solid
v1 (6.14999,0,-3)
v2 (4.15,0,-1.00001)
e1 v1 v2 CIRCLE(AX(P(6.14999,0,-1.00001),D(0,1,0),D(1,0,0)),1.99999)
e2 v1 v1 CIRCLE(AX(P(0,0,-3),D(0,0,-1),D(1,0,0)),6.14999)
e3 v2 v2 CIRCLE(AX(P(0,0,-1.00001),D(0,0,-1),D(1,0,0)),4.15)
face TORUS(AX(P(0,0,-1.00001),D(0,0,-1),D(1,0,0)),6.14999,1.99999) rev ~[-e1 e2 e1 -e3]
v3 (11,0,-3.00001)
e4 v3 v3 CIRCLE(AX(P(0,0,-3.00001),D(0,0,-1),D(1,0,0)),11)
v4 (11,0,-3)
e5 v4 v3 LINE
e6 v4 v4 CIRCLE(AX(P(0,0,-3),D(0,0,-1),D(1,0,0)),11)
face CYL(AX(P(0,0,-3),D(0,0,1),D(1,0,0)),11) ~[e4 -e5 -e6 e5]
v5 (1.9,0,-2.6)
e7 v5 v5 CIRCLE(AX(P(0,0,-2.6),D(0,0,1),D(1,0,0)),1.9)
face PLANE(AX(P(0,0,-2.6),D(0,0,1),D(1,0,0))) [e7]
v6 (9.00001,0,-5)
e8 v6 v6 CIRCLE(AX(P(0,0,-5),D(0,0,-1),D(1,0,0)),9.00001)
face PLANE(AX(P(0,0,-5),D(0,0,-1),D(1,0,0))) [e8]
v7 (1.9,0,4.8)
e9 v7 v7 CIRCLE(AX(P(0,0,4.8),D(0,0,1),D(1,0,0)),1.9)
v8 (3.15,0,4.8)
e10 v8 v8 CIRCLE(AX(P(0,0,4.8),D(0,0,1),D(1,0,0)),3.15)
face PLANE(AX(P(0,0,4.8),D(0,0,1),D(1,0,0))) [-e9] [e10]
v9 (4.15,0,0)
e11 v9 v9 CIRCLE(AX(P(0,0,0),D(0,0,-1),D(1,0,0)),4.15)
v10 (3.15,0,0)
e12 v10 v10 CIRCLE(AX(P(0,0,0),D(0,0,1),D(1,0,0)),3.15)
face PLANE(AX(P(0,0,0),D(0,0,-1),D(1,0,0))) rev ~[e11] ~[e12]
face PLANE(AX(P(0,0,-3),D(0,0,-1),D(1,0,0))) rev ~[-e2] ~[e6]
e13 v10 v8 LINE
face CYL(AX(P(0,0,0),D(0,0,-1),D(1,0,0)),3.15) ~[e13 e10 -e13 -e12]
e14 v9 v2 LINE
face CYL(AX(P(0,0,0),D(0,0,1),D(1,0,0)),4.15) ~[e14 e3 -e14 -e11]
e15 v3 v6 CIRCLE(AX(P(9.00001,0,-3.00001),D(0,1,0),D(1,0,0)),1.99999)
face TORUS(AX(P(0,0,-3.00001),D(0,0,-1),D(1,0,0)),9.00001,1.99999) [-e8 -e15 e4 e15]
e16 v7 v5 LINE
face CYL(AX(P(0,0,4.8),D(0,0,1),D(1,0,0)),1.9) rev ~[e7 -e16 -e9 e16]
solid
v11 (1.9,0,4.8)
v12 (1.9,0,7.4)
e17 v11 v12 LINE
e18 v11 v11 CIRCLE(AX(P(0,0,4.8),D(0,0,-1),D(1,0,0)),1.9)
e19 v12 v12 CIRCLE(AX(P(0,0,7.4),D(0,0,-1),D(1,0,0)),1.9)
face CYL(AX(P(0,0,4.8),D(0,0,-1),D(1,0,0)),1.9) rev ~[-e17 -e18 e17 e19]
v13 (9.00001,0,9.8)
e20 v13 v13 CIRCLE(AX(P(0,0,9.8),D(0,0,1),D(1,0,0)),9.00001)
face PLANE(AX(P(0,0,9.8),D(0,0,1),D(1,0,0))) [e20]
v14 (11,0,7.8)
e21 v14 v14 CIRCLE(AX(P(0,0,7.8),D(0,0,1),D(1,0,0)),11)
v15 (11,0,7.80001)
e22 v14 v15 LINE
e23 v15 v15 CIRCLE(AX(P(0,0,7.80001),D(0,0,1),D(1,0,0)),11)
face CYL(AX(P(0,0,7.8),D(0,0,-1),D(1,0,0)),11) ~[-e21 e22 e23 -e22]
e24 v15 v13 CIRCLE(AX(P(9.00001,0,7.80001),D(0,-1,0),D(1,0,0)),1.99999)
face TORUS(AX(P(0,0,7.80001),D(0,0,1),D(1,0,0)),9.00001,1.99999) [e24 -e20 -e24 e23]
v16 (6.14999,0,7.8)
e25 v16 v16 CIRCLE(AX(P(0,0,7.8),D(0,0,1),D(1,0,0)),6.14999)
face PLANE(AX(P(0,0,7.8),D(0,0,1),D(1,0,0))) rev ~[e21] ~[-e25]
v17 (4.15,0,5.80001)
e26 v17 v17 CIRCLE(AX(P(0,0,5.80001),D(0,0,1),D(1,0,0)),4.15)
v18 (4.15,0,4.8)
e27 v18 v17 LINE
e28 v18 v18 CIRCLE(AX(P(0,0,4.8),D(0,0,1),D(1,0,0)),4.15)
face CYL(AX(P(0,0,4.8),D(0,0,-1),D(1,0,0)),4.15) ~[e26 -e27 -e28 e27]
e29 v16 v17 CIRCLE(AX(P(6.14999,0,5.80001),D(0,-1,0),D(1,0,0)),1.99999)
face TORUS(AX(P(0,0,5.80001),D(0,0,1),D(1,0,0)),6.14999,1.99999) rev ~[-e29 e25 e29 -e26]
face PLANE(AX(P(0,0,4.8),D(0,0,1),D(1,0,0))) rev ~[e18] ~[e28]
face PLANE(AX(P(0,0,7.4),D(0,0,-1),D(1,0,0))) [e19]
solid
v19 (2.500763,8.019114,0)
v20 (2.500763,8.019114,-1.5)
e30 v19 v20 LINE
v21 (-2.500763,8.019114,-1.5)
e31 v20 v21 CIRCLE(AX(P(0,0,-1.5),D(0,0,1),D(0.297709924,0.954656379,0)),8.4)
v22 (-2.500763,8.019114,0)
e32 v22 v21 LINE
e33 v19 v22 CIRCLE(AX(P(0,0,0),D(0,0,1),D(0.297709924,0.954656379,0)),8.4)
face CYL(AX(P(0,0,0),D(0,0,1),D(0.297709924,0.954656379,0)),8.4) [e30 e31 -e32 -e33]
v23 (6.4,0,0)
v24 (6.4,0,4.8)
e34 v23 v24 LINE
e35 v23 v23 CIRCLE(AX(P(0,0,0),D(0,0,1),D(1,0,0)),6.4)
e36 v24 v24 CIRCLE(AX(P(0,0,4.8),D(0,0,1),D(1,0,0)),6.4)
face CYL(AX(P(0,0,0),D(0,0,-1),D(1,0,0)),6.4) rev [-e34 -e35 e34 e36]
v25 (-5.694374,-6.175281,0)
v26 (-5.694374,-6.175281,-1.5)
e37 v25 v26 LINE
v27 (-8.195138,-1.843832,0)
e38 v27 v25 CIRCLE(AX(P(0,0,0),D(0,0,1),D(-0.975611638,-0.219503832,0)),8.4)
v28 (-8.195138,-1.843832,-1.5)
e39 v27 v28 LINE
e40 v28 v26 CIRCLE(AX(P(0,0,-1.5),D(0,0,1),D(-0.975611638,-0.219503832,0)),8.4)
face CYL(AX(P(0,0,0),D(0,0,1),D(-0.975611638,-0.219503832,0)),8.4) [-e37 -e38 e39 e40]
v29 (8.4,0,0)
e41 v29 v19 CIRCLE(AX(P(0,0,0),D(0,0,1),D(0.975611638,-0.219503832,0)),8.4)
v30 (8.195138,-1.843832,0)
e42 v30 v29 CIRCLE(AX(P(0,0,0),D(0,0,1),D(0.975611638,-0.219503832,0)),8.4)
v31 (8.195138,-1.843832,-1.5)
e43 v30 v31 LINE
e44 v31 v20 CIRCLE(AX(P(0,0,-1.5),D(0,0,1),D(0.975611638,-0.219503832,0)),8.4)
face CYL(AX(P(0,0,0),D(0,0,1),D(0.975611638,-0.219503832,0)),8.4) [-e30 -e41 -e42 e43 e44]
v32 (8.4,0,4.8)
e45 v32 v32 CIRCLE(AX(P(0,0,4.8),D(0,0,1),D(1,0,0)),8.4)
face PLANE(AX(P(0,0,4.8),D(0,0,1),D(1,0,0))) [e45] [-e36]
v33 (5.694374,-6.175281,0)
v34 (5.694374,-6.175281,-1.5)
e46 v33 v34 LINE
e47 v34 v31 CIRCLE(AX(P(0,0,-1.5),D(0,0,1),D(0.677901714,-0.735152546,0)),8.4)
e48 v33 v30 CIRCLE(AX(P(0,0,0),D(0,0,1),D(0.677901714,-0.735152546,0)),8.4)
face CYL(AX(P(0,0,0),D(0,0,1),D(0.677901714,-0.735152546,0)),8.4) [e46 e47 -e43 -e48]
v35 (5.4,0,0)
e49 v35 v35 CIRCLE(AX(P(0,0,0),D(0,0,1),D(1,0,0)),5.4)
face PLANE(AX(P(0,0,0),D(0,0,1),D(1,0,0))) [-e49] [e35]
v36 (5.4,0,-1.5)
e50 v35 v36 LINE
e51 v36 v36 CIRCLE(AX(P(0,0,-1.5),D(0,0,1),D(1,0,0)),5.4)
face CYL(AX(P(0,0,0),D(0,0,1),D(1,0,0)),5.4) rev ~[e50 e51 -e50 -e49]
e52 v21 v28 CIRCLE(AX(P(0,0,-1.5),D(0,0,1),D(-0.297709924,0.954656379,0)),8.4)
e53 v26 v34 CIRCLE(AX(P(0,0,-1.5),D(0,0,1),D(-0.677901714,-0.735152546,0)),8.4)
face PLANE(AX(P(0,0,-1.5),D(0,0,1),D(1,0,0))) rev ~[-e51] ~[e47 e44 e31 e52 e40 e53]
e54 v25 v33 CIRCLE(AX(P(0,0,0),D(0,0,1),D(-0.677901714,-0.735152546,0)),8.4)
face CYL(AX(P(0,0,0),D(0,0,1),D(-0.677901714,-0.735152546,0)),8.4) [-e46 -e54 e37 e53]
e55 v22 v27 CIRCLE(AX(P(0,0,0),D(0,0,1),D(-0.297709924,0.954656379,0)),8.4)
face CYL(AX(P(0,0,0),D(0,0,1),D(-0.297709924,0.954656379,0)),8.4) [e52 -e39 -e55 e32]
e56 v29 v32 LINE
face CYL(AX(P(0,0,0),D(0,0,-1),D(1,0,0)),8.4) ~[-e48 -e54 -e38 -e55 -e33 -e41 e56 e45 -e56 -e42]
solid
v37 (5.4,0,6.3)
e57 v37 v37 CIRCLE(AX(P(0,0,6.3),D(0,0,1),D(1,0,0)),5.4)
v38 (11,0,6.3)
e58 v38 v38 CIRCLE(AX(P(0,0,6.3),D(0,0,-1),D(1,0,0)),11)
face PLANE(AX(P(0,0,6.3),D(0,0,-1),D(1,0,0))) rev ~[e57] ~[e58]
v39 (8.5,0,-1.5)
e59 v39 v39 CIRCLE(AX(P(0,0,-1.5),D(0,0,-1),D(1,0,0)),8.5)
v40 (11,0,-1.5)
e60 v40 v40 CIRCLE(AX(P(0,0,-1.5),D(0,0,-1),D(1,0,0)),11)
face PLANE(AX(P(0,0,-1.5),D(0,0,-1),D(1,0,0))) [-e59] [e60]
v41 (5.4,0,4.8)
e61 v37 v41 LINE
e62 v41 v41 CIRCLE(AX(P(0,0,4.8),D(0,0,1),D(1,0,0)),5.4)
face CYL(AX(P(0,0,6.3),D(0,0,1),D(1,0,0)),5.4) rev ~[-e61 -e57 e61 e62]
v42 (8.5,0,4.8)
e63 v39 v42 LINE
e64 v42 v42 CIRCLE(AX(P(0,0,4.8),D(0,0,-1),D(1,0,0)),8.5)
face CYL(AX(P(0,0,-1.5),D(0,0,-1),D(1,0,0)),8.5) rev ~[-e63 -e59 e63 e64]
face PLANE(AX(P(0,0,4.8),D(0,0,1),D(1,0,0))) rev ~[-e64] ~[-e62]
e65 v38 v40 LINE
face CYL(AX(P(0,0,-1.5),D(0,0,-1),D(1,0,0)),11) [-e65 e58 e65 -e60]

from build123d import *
from build123d import SkipClean  # not in build123d's __all__

# Parameters (mm, degrees)
F0_R      = 5.4
F1_DEPTH  = 1.5
F2_R      = 8.4
F2_R_2    = 6.4
F3_DEPTH  = 4.8
F4_R      = 11
F4_R_2    = 8.5
F5_DEPTH  = 7.8
F6_R      = 11
F6_R_2    = 5.4
F7_DEPTH  = 1.5
F8_R      = 3.15
F9_DEPTH  = 4.8
F10_R     = 4.15
F11_DEPTH = 3
F12_R     = 11
F13_DEPTH = 2
F14_R     = 1.9
F15_DEPTH = 7.4
F16_R     = 1.99999
F17_R     = 4.15
F18_DEPTH = 3
F19_R     = 11
F20_DEPTH = 2
F21_R     = 1.9
F22_DEPTH = 2.6
F23_R     = 1.99999


# Not quite as in the source:
# - a fillet or chamfer is up to 0.001 mm smaller than in the source, because OpenCascade refuses the exact size


with BuildPart() as f1:
    # F0 (on Top) → F1 (new body)
    with BuildSketch(Plane.XY):
        with BuildLine():
            ThreePointArc((2.5007633588, 8.0191135809), (0, 8.4), (-2.5007633588, 8.0191135809))
            ThreePointArc((-2.5007633588, 8.0191135809), (-7.2746133918, 4.2), (-8.1951377563, -1.8438321929))
            ThreePointArc((-8.1951377563, -1.8438321929), (-7.2746133918, -4.2), (-5.6943743975, -6.175281388))
            ThreePointArc((-5.6943743975, -6.175281388), (0, -8.4), (5.6943743975, -6.175281388))
            ThreePointArc((5.6943743975, -6.175281388), (7.2746133918, -4.2), (8.1951377563, -1.8438321929))
            ThreePointArc((8.1951377563, -1.8438321929), (7.2746133918, 4.2), (2.5007633588, 8.0191135809))
        make_face()
        Circle(F0_R, mode=Mode.SUBTRACT)
    extrude(amount=-F1_DEPTH)

    # F2 (on face) → F3 (join)
    with BuildSketch(Plane.XY):
        Circle(F2_R)
        Circle(F2_R_2, mode=Mode.SUBTRACT)
    with SkipClean():  # cleaning this boolean's faces spoils the solid; the shape is the same uncleaned
        extrude(amount=F3_DEPTH)


with BuildPart() as f5:
    # F4 (on face) → F5 (new body)
    with BuildSketch(Plane(origin=(0, 0, -1.5), x_dir=(1, 0, 0), z_dir=(0, 0, -1))):
        Circle(F4_R)
        Circle(F4_R_2, mode=Mode.SUBTRACT)
    extrude(amount=-F5_DEPTH)

    # F6 (on face) → F7 (join)
    with BuildSketch(Plane.XY.offset(6.3)):
        Circle(F6_R)
        Circle(F6_R_2, mode=Mode.SUBTRACT)
    extrude(amount=-F7_DEPTH)


with BuildPart() as f9:
    # F8 (on face) → F9 (new body)
    with BuildSketch(Plane.XY):
        Circle(F8_R)
    extrude(amount=F9_DEPTH)

    # F10 (on face) → F11 (join, through all)
    with BuildSketch(Plane(origin=(0, 0, 0), x_dir=(1, 0, 0), z_dir=(0, 0, -1))):
        Circle(F10_R)
    extrude(amount=F11_DEPTH)

    # F12 (on face) → F13 (join)
    with BuildSketch(Plane(origin=(0, 0, -3), x_dir=(1, 0, 0), z_dir=(0, 0, -1))):
        Circle(F12_R)
    extrude(amount=F13_DEPTH)

    # F14 (on face) → F15 (cut)
    with BuildSketch(Plane.XY.offset(4.8)):
        Circle(F14_R)
    extrude(amount=-F15_DEPTH, mode=Mode.SUBTRACT)

    # F16 (radius 2 in the source; OpenCascade refuses exactly that, so slightly less here)
    f16_edges = [f9.edges().sort_by_distance(p)[0] for p in [
        (-4.15, 0, -3),
        (-11, 0, -5),
    ]]
    fillet(f16_edges, radius=F16_R)


with BuildPart() as f18:
    # F17 (on face) → F18 (new body, through all)
    with BuildSketch(Plane.XY.offset(4.8)):
        Circle(F17_R)
    extrude(amount=F18_DEPTH)

    # F19 (on face) → F20 (join)
    with BuildSketch(Plane.XY.offset(7.8)):
        Circle(F19_R)
    extrude(amount=F20_DEPTH)

    # F21 (on face) → F22 (cut)
    with BuildSketch(Plane(origin=(0, 0, 4.8), x_dir=(1, 0, 0), z_dir=(0, 0, -1))):
        Circle(F21_R)
    extrude(amount=-F22_DEPTH, mode=Mode.SUBTRACT)

    # F23 (radius 2 in the source; OpenCascade refuses exactly that, so slightly less here)
    f23_edges = [f18.edges().sort_by_distance(p)[0] for p in [
        (-11, 0, 9.8),
        (-4.15, 0, 7.8),
    ]]
    fillet(f23_edges, radius=F23_R)


solid = Compound([f1.part, f5.part, f9.part, f18.part])
